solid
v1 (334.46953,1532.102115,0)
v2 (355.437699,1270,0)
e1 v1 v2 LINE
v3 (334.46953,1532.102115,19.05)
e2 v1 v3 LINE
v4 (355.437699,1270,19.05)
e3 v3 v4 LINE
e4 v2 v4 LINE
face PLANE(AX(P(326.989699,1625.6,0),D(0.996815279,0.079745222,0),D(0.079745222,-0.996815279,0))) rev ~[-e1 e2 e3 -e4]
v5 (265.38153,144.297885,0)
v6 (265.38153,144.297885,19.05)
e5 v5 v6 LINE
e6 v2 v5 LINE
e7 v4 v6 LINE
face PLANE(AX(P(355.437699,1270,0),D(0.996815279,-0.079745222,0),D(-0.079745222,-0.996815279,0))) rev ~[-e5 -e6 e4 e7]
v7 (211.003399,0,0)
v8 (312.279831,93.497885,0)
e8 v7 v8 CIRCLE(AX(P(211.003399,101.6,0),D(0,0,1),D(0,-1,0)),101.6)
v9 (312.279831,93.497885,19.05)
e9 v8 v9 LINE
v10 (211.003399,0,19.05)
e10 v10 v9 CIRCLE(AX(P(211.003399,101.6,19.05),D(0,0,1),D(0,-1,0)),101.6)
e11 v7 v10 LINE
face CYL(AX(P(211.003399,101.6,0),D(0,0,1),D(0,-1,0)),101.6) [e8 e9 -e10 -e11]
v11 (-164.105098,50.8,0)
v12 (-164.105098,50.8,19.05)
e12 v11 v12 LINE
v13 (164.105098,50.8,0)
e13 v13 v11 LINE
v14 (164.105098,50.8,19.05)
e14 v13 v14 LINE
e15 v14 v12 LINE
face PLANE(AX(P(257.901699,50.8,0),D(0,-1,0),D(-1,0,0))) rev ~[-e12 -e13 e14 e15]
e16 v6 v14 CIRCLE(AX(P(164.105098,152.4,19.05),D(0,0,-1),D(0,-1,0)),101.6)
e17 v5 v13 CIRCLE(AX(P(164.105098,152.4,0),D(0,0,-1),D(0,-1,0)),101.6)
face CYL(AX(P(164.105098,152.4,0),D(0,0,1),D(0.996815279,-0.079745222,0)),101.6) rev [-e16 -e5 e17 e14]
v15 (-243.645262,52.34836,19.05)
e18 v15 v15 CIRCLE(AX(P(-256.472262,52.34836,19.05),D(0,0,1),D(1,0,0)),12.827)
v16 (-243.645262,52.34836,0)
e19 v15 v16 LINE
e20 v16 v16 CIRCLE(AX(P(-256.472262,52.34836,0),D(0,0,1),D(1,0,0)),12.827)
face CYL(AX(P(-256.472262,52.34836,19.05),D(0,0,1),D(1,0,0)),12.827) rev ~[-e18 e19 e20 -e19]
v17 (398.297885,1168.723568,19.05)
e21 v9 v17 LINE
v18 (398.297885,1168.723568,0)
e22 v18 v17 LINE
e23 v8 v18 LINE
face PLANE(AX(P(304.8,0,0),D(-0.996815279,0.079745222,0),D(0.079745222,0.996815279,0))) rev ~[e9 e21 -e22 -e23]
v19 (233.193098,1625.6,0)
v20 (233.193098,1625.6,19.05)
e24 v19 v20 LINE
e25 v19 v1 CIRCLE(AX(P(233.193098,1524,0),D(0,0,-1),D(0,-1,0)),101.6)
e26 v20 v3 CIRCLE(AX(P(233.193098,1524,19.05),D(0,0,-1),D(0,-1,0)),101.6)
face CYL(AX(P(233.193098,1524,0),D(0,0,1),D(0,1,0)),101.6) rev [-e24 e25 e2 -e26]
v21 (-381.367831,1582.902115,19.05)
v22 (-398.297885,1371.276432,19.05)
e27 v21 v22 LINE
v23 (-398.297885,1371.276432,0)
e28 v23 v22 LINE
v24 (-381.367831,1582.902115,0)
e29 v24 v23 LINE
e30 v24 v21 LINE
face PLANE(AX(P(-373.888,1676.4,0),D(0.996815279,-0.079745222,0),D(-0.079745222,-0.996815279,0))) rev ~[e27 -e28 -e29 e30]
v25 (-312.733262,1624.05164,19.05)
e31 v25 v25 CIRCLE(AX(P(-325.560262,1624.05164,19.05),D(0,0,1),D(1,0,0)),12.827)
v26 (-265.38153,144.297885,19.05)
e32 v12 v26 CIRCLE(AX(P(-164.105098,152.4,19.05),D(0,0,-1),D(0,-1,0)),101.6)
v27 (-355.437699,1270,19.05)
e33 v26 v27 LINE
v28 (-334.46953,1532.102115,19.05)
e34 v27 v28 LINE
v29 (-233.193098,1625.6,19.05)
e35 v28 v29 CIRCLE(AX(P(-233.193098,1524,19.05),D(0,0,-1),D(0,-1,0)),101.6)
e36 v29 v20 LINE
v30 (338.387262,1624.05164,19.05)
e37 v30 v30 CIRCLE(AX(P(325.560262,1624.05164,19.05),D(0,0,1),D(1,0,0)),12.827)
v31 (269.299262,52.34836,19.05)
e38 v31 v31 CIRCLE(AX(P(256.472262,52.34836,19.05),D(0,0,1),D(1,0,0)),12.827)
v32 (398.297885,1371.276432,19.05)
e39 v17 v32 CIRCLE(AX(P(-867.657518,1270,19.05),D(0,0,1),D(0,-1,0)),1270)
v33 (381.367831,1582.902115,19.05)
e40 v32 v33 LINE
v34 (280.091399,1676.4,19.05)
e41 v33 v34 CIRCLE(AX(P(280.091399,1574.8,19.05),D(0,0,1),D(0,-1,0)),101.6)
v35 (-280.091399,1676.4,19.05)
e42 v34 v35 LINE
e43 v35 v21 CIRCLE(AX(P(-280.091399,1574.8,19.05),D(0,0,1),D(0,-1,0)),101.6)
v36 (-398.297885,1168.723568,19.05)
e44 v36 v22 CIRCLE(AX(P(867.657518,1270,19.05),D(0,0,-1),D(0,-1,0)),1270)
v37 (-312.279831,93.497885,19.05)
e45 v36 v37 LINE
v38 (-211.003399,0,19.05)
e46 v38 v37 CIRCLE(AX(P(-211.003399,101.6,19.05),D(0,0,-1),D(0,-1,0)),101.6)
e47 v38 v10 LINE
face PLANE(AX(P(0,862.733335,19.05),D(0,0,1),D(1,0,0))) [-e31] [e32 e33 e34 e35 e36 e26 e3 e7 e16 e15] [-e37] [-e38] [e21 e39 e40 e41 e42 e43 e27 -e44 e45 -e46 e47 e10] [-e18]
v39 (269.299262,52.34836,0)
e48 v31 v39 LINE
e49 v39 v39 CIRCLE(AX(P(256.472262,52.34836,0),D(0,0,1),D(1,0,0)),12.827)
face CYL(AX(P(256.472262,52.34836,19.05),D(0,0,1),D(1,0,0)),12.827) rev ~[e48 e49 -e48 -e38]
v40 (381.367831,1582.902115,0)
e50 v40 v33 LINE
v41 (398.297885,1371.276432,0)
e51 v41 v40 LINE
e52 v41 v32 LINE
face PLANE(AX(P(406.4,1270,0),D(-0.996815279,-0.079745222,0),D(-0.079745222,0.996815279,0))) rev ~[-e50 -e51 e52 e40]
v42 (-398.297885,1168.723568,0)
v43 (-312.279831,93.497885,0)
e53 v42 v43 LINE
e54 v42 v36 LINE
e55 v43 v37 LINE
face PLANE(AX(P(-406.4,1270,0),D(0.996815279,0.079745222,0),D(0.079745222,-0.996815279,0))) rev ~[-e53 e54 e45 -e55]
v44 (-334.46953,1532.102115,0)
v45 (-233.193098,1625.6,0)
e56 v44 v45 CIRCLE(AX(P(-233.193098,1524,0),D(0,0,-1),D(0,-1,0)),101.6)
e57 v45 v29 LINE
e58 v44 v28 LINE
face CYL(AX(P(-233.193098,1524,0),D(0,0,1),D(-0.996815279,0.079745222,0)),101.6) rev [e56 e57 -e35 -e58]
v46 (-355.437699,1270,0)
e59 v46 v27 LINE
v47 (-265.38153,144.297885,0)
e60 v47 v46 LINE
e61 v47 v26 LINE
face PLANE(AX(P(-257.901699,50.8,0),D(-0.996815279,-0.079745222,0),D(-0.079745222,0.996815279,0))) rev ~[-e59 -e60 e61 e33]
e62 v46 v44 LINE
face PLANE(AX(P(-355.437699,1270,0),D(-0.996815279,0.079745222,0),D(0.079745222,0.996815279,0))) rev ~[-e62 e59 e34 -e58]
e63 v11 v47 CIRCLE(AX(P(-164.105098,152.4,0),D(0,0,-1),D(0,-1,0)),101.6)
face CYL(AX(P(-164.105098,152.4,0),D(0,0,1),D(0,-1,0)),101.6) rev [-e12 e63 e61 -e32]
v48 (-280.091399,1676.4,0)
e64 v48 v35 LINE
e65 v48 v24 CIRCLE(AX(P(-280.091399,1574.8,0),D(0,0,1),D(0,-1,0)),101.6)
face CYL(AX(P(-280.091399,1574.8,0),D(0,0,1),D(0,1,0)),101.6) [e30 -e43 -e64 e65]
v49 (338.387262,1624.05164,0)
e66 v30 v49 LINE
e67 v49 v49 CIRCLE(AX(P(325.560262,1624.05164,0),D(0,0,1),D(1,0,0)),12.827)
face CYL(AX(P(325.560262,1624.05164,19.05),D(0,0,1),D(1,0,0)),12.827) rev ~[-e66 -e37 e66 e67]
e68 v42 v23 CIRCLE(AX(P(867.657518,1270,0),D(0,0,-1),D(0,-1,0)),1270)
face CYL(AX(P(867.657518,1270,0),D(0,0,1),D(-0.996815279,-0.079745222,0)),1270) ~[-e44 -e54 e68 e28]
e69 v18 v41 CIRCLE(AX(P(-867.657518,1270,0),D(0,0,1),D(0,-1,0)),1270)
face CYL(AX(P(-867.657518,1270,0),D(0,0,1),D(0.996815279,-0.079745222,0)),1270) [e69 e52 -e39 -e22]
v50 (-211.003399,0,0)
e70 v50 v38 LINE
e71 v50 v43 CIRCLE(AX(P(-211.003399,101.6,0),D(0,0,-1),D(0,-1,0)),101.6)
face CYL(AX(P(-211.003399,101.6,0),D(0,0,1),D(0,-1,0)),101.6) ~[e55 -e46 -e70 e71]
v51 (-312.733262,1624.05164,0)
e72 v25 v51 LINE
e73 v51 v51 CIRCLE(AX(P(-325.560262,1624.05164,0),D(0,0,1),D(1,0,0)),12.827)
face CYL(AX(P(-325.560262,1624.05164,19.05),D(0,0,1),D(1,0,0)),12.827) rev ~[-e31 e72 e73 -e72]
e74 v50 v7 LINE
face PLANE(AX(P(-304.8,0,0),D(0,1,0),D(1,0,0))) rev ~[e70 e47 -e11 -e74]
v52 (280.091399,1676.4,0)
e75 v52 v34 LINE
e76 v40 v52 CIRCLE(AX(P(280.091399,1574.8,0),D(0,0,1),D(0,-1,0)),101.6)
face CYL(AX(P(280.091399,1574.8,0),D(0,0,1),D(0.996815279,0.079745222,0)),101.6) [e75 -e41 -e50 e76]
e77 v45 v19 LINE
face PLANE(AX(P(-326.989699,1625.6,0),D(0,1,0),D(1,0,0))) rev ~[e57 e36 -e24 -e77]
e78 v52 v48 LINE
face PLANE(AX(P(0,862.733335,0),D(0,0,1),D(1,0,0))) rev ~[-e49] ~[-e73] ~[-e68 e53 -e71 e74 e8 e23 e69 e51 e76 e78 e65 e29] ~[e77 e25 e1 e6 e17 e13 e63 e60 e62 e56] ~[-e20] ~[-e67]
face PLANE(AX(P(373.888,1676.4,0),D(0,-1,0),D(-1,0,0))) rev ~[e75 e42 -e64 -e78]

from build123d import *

# Parameters (mm, degrees)
F1_DEPTH = 19.05
F2_R     = 101.6
F3_R     = 1270
F4_R     = 12.827
F5_DEPTH = 19.051


# Not quite as in the source:
# - a feature names something its author has since deleted; it is built from what else it names


with BuildPart() as f1:
    # F0 (on Top) → F1 (new body)
    with BuildSketch(Plane.XY):
        Polygon((-304.8, 0), (0, 0), (304.8, 0), (406.4, 1270), (373.888, 1676.4), (0, 1676.4), (-373.888, 1676.4), (-406.4, 1270), align=None)
        Polygon((-326.989699267, 1625.6), (0, 1625.6), (326.989699267, 1625.6), (355.437699267, 1270), (257.901699267, 50.8), (0, 50.8), (-257.901699267, 50.8), (-355.437699267, 1270), align=None, mode=Mode.SUBTRACT)
    extrude(amount=F1_DEPTH)

    # F2
    f2_edges = [f1.edges().sort_by_distance(p)[0] for p in [
        (-304.8, 0, 9.525),
        (304.8, 0, 9.525),
        (373.888, 1676.4, 9.525),
        (-373.888, 1676.4, 9.525),
        (-326.989699, 1625.6, 9.525),
        (326.989699, 1625.6, 9.525),
        (-257.901699, 50.8, 9.525),
        (257.901699, 50.8, 9.525),
    ]]
    fillet(f2_edges, radius=F2_R)

    # F3
    f3_edges = [f1.edges().sort_by_distance(p)[0] for p in [
        (-406.4, 1270, 9.525),
        (406.4, 1270, 9.525),
    ]]
    fillet(f3_edges, radius=F3_R)

    # F4 (on face) → F5 (cut, through all)
    with BuildSketch(Plane.XY.offset(19.05)):
        with Locations((256.4722616265, 52.3483595568)):
            Circle(F4_R)
        with Locations((-256.4722616265, 52.3483595568)):
            Circle(F4_R)
        with Locations((-325.5602616265, 1624.0516404432)):
            Circle(F4_R)
        with Locations((325.5602616265, 1624.0516404432)):
            Circle(F4_R)
    extrude(amount=-F5_DEPTH, mode=Mode.SUBTRACT)


solid = f1.part
